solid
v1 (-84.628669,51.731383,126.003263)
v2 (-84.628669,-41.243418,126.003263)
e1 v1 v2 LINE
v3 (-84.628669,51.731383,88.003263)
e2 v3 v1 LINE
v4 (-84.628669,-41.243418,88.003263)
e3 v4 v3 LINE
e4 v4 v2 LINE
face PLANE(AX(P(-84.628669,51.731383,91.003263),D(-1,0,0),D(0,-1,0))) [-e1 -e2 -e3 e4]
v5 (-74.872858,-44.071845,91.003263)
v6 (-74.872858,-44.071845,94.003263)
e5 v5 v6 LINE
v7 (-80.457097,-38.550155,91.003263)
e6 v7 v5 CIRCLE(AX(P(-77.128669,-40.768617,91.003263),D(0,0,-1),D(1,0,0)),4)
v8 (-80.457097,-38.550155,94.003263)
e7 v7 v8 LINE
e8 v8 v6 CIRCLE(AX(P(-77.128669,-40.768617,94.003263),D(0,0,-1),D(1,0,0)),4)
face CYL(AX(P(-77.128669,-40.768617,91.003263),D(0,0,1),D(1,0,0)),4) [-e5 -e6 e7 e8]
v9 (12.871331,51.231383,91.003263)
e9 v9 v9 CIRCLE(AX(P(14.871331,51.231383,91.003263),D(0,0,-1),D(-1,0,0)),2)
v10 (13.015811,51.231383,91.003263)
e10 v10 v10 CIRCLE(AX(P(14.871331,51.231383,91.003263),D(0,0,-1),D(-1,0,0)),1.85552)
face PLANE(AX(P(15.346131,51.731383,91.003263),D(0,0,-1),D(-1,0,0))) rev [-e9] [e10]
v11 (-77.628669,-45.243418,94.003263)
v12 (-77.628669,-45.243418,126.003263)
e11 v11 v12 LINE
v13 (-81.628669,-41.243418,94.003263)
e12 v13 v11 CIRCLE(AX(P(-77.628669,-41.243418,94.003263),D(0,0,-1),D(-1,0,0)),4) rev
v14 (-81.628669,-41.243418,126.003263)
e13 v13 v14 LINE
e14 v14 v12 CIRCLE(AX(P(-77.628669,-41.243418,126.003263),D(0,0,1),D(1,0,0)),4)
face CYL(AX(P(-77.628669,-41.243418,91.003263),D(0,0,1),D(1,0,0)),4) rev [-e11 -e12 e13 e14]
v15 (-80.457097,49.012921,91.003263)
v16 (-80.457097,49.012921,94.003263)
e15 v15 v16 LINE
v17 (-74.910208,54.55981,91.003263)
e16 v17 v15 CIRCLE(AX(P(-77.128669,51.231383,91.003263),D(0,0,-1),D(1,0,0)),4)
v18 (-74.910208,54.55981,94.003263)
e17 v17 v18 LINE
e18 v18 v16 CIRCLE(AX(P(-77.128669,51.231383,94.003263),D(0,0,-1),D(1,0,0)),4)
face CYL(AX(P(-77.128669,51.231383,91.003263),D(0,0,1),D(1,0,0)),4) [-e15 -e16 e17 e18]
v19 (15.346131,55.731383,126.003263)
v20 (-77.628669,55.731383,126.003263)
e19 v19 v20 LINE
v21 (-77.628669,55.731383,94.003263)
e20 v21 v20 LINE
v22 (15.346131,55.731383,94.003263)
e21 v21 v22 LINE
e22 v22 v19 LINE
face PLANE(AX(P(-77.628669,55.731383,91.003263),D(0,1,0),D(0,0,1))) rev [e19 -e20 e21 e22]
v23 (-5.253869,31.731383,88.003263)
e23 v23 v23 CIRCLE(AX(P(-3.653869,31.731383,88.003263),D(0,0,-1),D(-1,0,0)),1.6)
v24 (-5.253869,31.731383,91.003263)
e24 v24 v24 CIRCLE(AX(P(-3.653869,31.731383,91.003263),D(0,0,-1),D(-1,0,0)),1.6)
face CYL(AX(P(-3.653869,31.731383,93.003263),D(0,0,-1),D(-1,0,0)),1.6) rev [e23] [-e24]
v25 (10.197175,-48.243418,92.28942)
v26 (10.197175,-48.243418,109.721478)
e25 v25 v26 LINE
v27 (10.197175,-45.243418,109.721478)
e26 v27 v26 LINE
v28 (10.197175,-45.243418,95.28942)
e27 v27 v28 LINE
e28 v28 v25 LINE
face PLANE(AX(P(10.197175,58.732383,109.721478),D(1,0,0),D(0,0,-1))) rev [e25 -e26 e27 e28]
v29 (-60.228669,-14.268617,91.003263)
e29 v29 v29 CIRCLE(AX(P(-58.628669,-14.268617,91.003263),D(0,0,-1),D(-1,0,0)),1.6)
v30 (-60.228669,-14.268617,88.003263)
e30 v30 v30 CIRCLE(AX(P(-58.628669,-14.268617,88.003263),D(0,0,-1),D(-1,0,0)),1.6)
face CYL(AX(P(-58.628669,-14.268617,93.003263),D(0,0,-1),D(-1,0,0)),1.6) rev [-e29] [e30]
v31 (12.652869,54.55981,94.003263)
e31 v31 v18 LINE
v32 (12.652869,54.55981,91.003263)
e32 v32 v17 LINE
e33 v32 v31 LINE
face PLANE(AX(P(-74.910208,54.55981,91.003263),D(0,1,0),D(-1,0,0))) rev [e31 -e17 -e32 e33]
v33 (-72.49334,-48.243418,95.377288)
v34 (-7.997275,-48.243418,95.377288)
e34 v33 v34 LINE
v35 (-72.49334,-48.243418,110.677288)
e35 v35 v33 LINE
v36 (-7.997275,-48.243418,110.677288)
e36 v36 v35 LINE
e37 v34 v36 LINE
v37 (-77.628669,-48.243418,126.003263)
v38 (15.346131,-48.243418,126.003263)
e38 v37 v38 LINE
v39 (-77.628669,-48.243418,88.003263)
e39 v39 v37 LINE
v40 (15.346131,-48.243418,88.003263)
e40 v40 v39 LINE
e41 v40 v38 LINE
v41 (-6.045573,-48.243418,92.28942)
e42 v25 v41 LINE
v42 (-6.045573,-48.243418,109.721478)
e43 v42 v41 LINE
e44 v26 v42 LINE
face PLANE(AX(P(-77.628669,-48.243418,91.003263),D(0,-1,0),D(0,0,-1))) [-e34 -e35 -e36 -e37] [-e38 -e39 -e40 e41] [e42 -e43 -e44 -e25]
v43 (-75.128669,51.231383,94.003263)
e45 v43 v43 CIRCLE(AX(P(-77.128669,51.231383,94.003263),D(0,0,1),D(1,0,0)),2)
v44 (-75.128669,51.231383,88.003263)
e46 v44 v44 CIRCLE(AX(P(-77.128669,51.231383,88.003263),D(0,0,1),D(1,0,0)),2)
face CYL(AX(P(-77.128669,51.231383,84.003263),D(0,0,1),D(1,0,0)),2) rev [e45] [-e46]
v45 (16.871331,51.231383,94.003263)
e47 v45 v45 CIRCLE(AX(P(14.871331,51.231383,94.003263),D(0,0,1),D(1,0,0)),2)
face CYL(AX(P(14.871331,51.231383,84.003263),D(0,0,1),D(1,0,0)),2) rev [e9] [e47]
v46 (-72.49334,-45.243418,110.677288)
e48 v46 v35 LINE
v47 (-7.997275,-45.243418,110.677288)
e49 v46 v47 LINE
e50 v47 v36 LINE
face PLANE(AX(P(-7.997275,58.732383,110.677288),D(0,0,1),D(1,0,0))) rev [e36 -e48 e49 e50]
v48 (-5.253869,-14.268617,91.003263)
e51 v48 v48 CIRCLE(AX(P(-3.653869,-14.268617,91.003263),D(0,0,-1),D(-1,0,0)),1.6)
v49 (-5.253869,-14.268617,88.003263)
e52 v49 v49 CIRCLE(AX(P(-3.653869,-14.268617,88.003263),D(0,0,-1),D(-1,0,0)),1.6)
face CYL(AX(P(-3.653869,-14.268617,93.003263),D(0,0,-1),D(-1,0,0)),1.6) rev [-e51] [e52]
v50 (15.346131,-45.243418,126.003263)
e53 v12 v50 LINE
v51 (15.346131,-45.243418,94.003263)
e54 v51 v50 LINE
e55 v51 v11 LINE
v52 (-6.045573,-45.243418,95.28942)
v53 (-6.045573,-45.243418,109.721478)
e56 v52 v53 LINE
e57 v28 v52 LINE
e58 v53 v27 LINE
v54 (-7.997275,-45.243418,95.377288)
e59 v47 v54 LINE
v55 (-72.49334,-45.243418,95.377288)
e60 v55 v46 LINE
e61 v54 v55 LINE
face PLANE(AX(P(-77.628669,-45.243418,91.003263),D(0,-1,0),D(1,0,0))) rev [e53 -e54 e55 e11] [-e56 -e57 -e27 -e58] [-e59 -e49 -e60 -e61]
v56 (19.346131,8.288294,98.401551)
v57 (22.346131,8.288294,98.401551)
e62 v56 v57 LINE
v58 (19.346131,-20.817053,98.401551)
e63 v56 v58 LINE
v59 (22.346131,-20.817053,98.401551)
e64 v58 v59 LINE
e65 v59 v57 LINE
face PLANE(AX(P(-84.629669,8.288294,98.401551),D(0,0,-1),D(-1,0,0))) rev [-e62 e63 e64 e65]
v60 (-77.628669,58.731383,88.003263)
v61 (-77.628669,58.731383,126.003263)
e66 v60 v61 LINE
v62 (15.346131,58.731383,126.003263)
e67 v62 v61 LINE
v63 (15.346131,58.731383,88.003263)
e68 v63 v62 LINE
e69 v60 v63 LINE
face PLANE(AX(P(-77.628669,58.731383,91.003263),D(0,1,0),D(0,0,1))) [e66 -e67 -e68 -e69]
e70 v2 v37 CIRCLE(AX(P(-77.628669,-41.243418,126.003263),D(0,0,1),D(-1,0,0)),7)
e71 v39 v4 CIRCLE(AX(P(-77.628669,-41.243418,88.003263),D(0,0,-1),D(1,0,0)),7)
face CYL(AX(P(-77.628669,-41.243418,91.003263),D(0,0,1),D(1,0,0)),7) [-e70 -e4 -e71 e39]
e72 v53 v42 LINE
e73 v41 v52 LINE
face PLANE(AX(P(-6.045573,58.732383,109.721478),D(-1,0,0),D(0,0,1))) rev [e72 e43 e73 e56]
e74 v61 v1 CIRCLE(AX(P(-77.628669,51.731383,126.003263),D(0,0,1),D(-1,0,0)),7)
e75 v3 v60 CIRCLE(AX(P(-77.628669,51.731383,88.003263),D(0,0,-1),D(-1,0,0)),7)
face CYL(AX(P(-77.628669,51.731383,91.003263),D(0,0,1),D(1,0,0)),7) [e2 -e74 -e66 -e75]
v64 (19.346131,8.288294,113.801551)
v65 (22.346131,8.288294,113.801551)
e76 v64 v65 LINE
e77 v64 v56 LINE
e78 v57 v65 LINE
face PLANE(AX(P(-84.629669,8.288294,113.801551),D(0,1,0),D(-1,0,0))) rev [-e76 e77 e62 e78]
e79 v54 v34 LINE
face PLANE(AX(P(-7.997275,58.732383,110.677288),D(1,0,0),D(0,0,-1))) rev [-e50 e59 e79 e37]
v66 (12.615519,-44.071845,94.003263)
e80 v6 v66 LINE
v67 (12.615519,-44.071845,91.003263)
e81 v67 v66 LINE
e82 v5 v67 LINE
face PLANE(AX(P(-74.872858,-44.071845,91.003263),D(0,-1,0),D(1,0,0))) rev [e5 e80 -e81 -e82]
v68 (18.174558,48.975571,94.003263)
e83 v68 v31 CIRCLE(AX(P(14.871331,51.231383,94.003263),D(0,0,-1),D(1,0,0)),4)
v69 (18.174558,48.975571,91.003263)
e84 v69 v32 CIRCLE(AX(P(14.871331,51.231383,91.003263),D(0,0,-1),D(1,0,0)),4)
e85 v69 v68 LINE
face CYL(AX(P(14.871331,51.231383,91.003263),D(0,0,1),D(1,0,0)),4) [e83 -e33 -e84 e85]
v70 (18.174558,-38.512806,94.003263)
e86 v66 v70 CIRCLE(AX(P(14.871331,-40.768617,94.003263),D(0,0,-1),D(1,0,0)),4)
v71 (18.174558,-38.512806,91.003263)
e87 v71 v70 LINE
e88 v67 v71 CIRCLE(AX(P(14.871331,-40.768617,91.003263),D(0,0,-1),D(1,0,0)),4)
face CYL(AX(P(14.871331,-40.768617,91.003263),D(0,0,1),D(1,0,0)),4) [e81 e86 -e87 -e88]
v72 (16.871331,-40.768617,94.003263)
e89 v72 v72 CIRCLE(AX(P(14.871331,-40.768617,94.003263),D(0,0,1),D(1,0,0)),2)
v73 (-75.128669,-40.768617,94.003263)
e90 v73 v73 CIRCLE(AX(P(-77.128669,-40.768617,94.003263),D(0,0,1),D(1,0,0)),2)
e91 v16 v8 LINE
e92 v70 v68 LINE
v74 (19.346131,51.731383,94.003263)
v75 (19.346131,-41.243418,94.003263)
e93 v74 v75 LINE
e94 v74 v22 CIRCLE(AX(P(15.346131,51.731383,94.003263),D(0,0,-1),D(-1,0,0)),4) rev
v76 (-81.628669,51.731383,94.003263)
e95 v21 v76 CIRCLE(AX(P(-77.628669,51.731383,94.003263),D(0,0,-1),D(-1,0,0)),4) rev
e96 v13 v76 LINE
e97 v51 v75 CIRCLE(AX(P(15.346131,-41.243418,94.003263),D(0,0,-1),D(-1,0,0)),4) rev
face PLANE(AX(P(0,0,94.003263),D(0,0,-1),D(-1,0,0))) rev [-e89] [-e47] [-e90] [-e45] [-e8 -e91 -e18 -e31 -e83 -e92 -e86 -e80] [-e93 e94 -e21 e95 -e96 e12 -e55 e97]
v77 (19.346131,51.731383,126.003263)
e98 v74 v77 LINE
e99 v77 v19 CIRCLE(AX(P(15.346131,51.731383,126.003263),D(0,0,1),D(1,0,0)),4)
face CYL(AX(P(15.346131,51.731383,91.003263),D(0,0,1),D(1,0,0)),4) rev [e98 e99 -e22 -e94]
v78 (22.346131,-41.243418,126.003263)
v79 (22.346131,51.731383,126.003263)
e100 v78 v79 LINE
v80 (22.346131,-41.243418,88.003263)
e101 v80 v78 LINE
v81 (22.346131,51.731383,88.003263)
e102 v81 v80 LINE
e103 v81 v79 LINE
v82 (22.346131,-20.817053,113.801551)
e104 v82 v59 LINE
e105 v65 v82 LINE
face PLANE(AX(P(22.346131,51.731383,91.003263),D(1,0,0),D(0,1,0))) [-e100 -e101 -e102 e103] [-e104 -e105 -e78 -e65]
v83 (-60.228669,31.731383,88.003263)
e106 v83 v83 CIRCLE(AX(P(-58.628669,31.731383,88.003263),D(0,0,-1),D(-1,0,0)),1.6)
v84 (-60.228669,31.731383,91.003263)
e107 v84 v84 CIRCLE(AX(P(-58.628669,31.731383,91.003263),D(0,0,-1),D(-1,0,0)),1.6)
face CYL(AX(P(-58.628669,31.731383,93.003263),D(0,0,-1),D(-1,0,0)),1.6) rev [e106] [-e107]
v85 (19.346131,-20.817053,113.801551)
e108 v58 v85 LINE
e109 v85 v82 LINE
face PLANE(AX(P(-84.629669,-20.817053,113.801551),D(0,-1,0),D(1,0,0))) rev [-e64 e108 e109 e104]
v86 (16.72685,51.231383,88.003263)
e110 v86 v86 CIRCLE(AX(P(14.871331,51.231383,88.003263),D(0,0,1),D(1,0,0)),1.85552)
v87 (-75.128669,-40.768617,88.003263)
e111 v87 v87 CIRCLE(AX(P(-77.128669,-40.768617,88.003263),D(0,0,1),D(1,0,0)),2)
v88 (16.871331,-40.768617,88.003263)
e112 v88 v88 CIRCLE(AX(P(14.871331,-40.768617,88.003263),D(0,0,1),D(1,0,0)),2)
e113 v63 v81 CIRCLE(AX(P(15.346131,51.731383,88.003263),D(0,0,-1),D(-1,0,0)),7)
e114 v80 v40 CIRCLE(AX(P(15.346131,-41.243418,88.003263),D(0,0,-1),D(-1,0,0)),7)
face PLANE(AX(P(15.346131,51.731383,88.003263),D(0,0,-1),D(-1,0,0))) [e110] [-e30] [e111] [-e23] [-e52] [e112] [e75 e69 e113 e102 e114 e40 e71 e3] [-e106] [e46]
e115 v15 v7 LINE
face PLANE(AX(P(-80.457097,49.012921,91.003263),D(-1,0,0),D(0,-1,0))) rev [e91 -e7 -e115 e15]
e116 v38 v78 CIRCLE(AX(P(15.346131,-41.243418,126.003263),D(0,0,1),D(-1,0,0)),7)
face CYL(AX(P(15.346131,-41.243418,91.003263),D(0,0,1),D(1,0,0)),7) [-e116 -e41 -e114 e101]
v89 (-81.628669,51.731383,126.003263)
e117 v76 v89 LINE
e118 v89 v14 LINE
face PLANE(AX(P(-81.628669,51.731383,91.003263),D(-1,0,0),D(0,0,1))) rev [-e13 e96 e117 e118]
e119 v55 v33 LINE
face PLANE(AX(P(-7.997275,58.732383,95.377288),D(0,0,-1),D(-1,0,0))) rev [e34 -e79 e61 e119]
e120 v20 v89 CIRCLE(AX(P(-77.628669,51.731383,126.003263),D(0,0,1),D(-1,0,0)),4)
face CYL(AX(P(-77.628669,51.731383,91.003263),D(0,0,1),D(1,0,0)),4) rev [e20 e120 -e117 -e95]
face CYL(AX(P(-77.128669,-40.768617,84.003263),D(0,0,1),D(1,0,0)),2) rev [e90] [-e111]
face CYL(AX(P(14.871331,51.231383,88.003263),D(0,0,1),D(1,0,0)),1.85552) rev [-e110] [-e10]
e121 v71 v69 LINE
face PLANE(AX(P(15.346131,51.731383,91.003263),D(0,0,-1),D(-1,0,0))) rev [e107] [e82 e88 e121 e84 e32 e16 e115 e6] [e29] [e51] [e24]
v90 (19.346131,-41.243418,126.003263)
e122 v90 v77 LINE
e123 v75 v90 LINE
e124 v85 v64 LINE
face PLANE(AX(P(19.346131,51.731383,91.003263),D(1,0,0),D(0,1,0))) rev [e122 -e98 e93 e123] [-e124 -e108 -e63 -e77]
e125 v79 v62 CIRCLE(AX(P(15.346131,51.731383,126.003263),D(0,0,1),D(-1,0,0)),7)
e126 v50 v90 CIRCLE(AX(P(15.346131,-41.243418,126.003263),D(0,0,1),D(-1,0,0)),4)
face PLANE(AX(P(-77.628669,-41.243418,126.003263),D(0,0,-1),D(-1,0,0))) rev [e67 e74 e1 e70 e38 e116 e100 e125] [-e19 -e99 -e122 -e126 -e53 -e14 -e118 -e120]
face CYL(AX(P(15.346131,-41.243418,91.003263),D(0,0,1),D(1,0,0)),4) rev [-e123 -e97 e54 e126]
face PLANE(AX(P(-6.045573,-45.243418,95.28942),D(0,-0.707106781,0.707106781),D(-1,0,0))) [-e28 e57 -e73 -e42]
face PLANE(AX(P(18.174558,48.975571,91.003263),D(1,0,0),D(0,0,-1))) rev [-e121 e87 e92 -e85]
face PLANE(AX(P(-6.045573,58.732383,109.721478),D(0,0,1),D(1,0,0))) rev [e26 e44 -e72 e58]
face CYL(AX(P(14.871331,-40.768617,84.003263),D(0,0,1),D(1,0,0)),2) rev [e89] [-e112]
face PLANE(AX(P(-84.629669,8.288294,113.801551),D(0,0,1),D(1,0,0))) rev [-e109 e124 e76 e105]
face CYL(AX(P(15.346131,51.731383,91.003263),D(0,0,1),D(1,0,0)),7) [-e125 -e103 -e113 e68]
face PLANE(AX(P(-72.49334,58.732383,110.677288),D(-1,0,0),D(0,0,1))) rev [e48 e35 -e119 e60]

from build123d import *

# Parameters (mm, degrees)
SCHIZZO1_W                        = 100.974800609
SCHIZZO1_H                        = 100.97480061
ESTRUSIONE_ESTRUSIONE1_DEPTH      = 3
SCHIZZO3_R                        = 2
TAGLIO_ESTRUSIONE1_DEPTH          = 10
RACCORDO1_R                       = 4
TAGLIO_ESTRUSIONE2_DEPTH          = 3
ESTRUSIONE_ESTRUSIONE2_DEPTH      = 32
ESTRUSIONE_ESTRUSIONE2_DEPTH_BACK = 3
ESTRUSIONE_ESTRUSIONE3_START      = 3
ESTRUSIONE_ESTRUSIONE3_DEPTH      = 3
TAGLIO_ESTRUSIONE3_REACH          = 187.694
SCHIZZO7_W                        = 16.242748833
SCHIZZO7_H                        = 14.432058418
SCHIZZO7_W_2                      = 64.496064987
SCHIZZO7_H_2                      = 15.3
TAGLIO_ESTRUSIONE4_REACH          = 177.413
SCHIZZO8_W                        = 15.4
SCHIZZO8_H                        = 29.105346697
SMUSSO1_SIZE                      = 3
SCHIZZO9_R                        = 2
SCHIZZO9_R_2                      = 1.85551968
TAGLIO_ESTRUSIONE5_DEPTH          = 108.867451135
SCHIZZO10_R                       = 1.6
TAGLIO_ESTRUSIONE6_DEPTH          = 5


with BuildPart() as part:
    # Schizzo1 → Estrusione-Estrusione1 (new body)
    with BuildSketch(Plane(origin=(0, 0, 94.00326253), x_dir=(-1, 0, 0), z_dir=(0, 0, -1))):
        with Locations((31.141269188, 5.2439824)):
            Rectangle(SCHIZZO1_W, SCHIZZO1_H)
    extrude(amount=ESTRUSIONE_ESTRUSIONE1_DEPTH)

    # Schizzo3 → Taglio-Estrusione1 (cut)
    with BuildSketch(Plane.XY.offset(94.00326253)):
        with Locations((-77.128669492, 51.231382705)):
            Circle(SCHIZZO3_R)
        with Locations((14.871330508, 51.231382705)):
            Circle(SCHIZZO3_R)
        with Locations((-77.128669492, -40.768617295)):
            Circle(SCHIZZO3_R)
        with Locations((14.871330508, -40.768617295)):
            Circle(SCHIZZO3_R)
    extrude(amount=-TAGLIO_ESTRUSIONE1_DEPTH, mode=Mode.SUBTRACT)

    # Raccordo1
    raccordo1_edges = [part.edges().sort_by_distance(p)[0] for p in [
        (19.346131117, 55.731382705, 92.50326253),
        (-81.628669492, 55.731382705, 92.50326253),
        (-81.628669492, -45.243417905, 92.50326253),
        (19.346131117, -45.243417905, 92.50326253),
    ]]
    fillet(raccordo1_edges, radius=RACCORDO1_R)

    # Schizzo4 → Taglio-Estrusione2 (cut)
    with BuildSketch(Plane.XY.offset(94.00326253)):
        with BuildLine():
            Line((-74.872857768, -44.07184503), (12.615518783, -44.07184503))
            ThreePointArc((12.615518783, -44.07184503), (12.042903383, -37.940190171), (18.174558242, -38.512805571))
            Line((18.174558242, -38.512805571), (18.174558242, 48.97557098))
            ThreePointArc((18.174558242, 48.97557098), (12.027018614, 48.418930065), (12.652868681, 54.559809829))
            Line((12.652868681, 54.559809829), (-74.910207666, 54.559809829))
            ThreePointArc((-74.910207666, 54.559809829), (-74.300242368, 48.40295558), (-80.457096617, 49.012920878))
            Line((-80.457096617, 49.012920878), (-80.457096617, -38.550155469))
            ThreePointArc((-80.457096617, -38.550155469), (-74.316216853, -37.924305402), (-74.872857768, -44.07184503))
        make_face()
    extrude(amount=-TAGLIO_ESTRUSIONE2_DEPTH, mode=Mode.SUBTRACT)

    # Schizzo5 → Estrusione-Estrusione2 (add, two sides: drawn at the far end of the back side and taken through both)
    with BuildSketch(Plane.XY.offset(94.00326253).offset(-ESTRUSIONE_ESTRUSIONE2_DEPTH_BACK)):
        with BuildLine():
            Line((-77.628669492, 58.731382705), (15.346131117, 58.731382705))
            ThreePointArc((15.346131117, 58.731382705), (20.295878585, 56.681130173), (22.346131117, 51.731382705))
            Line((22.346131117, 51.731382705), (22.346131117, -41.243417905))
            ThreePointArc((22.346131117, -41.243417905), (20.295878585, -46.193165373), (15.346131117, -48.243417905))
            Line((15.346131117, -48.243417905), (-77.628669492, -48.243417905))
            ThreePointArc((-77.628669492, -48.243417905), (-82.578416961, -46.193165373), (-84.628669492, -41.243417905))
            Line((-84.628669492, -41.243417905), (-84.628669492, 51.731382705))
            ThreePointArc((-84.628669492, 51.731382705), (-82.578416961, 56.681130173), (-77.628669492, 58.731382705))
        make_face()
        with BuildLine():
            Line((-77.628669492, 55.731382705), (15.346131117, 55.731382705))
            ThreePointArc((15.346131117, 55.731382705), (18.174558242, 54.559809829), (19.346131117, 51.731382705))
            Line((19.346131117, 51.731382705), (19.346131117, -41.243417905))
            ThreePointArc((19.346131117, -41.243417905), (18.174558242, -44.07184503), (15.346131117, -45.243417905))
            Line((15.346131117, -45.243417905), (-77.628669492, -45.243417905))
            ThreePointArc((-77.628669492, -45.243417905), (-80.457096617, -44.07184503), (-81.628669492, -41.243417905))
            Line((-81.628669492, -41.243417905), (-81.628669492, 51.731382705))
            ThreePointArc((-81.628669492, 51.731382705), (-80.457096617, 54.559809829), (-77.628669492, 55.731382705))
        make_face(mode=Mode.SUBTRACT)
    extrude(amount=ESTRUSIONE_ESTRUSIONE2_DEPTH + ESTRUSIONE_ESTRUSIONE2_DEPTH_BACK)

    # Schizzo6 → Estrusione-Estrusione3 (add)
    with BuildSketch(Plane(origin=(0, 0, 91.00326253), x_dir=(-1, 0, 0), z_dir=(0, 0, -1)).offset(ESTRUSIONE_ESTRUSIONE3_START)):
        with BuildLine():
            Line((-15.346131117, 58.731382705), (77.628669492, 58.731382705))
            ThreePointArc((77.628669492, 58.731382705), (82.578416961, 56.681130173), (84.628669492, 51.731382705))
            Line((84.628669492, 51.731382705), (84.628669492, -41.243417905))
            ThreePointArc((84.628669492, -41.243417905), (82.578416961, -46.193165373), (77.628669492, -48.243417905))
            Line((77.628669492, -48.243417905), (-15.346131117, -48.243417905))
            ThreePointArc((-15.346131117, -48.243417905), (-20.295878585, -46.193165373), (-22.346131117, -41.243417905))
            Line((-22.346131117, -41.243417905), (-22.346131117, 51.731382705))
            ThreePointArc((-22.346131117, 51.731382705), (-20.295878585, 56.681130173), (-15.346131117, 58.731382705))
        make_face()
    extrude(amount=-ESTRUSIONE_ESTRUSIONE3_DEPTH)

    # Schizzo7 → Taglio-Estrusione3 (cut, up to next)
    with BuildSketch(Plane.XZ.offset(48.243417905), mode=Mode.PRIVATE) as taglio_estrusione3_sk1:
        with Locations((2.075800916, 102.505448711)):
            Rectangle(SCHIZZO7_W, SCHIZZO7_H)
    taglio_estrusione3_tool1 = extrude(taglio_estrusione3_sk1.sketch, amount=-TAGLIO_ESTRUSIONE3_REACH, mode=Mode.PRIVATE) & part.part
    # Schizzo7 → Taglio-Estrusione3 (cut, up to next)
    with BuildSketch(Plane.XZ.offset(48.243417905), mode=Mode.PRIVATE) as taglio_estrusione3_sk2:
        with Locations((-40.245307891, 103.027287944)):
            Rectangle(SCHIZZO7_W_2, SCHIZZO7_H_2)
    taglio_estrusione3_tool2 = extrude(taglio_estrusione3_sk2.sketch, amount=-TAGLIO_ESTRUSIONE3_REACH, mode=Mode.PRIVATE) & part.part
    add(taglio_estrusione3_tool1.solids().sort_by_distance((2.075801, -48.243418, 102.505449))[0], mode=Mode.SUBTRACT)
    add(taglio_estrusione3_tool2.solids().sort_by_distance((-40.245308, -48.243418, 103.027288))[0], mode=Mode.SUBTRACT)

    # Schizzo8 → Taglio-Estrusione4 (cut, up to next)
    with BuildSketch(Plane(origin=(22.346131117, 0, 0), x_dir=(0, 0, -1), z_dir=(1, 0, 0)), mode=Mode.PRIVATE) as taglio_estrusione4_sk1:
        with Locations((-106.101551061, -6.264379468)):
            Rectangle(SCHIZZO8_W, SCHIZZO8_H)
    taglio_estrusione4_tool1 = extrude(taglio_estrusione4_sk1.sketch, amount=-TAGLIO_ESTRUSIONE4_REACH, mode=Mode.PRIVATE) & part.part
    add(taglio_estrusione4_tool1.solids().sort_by_distance((22.346131, -6.264379, 106.101551))[0], mode=Mode.SUBTRACT)

    # Smusso1
    smusso1_edges = [part.edges().sort_by_distance(p)[0] for p in [
        (2.075800916, -48.243417905, 95.289419502),
    ]]
    chamfer(smusso1_edges, length=SMUSSO1_SIZE - 0.0001)  # a hair under: the kernel refuses the full size

    # Schizzo9 → Taglio-Estrusione5 (cut, through all)
    with BuildSketch(Plane.XY.offset(94.00326253)):
        with Locations((-77.128669492, 51.231382705)):
            Circle(SCHIZZO9_R)
        with Locations((14.871330508, 51.231382705)):
            Circle(SCHIZZO9_R_2)
        with Locations((14.871330508, -40.768617295)):
            Circle(SCHIZZO9_R)
        with Locations((-77.128669492, -40.768617295)):
            Circle(SCHIZZO9_R)
    extrude(amount=-TAGLIO_ESTRUSIONE5_DEPTH, mode=Mode.SUBTRACT)

    # Schizzo10 → Taglio-Estrusione6 (cut)
    with BuildSketch(Plane(origin=(0, 0, 88.00326253), x_dir=(-1, 0, 0), z_dir=(0, 0, -1))):
        with Locations((3.653868883, 31.731382705)):
            Circle(SCHIZZO10_R)
        with Locations((3.653868883, -14.268617295)):
            Circle(SCHIZZO10_R)
        with Locations((58.628669492, -14.268617295)):
            Circle(SCHIZZO10_R)
        with Locations((58.628669492, 31.731382705)):
            Circle(SCHIZZO10_R)
    extrude(amount=-TAGLIO_ESTRUSIONE6_DEPTH, mode=Mode.SUBTRACT)


solid = part.part
